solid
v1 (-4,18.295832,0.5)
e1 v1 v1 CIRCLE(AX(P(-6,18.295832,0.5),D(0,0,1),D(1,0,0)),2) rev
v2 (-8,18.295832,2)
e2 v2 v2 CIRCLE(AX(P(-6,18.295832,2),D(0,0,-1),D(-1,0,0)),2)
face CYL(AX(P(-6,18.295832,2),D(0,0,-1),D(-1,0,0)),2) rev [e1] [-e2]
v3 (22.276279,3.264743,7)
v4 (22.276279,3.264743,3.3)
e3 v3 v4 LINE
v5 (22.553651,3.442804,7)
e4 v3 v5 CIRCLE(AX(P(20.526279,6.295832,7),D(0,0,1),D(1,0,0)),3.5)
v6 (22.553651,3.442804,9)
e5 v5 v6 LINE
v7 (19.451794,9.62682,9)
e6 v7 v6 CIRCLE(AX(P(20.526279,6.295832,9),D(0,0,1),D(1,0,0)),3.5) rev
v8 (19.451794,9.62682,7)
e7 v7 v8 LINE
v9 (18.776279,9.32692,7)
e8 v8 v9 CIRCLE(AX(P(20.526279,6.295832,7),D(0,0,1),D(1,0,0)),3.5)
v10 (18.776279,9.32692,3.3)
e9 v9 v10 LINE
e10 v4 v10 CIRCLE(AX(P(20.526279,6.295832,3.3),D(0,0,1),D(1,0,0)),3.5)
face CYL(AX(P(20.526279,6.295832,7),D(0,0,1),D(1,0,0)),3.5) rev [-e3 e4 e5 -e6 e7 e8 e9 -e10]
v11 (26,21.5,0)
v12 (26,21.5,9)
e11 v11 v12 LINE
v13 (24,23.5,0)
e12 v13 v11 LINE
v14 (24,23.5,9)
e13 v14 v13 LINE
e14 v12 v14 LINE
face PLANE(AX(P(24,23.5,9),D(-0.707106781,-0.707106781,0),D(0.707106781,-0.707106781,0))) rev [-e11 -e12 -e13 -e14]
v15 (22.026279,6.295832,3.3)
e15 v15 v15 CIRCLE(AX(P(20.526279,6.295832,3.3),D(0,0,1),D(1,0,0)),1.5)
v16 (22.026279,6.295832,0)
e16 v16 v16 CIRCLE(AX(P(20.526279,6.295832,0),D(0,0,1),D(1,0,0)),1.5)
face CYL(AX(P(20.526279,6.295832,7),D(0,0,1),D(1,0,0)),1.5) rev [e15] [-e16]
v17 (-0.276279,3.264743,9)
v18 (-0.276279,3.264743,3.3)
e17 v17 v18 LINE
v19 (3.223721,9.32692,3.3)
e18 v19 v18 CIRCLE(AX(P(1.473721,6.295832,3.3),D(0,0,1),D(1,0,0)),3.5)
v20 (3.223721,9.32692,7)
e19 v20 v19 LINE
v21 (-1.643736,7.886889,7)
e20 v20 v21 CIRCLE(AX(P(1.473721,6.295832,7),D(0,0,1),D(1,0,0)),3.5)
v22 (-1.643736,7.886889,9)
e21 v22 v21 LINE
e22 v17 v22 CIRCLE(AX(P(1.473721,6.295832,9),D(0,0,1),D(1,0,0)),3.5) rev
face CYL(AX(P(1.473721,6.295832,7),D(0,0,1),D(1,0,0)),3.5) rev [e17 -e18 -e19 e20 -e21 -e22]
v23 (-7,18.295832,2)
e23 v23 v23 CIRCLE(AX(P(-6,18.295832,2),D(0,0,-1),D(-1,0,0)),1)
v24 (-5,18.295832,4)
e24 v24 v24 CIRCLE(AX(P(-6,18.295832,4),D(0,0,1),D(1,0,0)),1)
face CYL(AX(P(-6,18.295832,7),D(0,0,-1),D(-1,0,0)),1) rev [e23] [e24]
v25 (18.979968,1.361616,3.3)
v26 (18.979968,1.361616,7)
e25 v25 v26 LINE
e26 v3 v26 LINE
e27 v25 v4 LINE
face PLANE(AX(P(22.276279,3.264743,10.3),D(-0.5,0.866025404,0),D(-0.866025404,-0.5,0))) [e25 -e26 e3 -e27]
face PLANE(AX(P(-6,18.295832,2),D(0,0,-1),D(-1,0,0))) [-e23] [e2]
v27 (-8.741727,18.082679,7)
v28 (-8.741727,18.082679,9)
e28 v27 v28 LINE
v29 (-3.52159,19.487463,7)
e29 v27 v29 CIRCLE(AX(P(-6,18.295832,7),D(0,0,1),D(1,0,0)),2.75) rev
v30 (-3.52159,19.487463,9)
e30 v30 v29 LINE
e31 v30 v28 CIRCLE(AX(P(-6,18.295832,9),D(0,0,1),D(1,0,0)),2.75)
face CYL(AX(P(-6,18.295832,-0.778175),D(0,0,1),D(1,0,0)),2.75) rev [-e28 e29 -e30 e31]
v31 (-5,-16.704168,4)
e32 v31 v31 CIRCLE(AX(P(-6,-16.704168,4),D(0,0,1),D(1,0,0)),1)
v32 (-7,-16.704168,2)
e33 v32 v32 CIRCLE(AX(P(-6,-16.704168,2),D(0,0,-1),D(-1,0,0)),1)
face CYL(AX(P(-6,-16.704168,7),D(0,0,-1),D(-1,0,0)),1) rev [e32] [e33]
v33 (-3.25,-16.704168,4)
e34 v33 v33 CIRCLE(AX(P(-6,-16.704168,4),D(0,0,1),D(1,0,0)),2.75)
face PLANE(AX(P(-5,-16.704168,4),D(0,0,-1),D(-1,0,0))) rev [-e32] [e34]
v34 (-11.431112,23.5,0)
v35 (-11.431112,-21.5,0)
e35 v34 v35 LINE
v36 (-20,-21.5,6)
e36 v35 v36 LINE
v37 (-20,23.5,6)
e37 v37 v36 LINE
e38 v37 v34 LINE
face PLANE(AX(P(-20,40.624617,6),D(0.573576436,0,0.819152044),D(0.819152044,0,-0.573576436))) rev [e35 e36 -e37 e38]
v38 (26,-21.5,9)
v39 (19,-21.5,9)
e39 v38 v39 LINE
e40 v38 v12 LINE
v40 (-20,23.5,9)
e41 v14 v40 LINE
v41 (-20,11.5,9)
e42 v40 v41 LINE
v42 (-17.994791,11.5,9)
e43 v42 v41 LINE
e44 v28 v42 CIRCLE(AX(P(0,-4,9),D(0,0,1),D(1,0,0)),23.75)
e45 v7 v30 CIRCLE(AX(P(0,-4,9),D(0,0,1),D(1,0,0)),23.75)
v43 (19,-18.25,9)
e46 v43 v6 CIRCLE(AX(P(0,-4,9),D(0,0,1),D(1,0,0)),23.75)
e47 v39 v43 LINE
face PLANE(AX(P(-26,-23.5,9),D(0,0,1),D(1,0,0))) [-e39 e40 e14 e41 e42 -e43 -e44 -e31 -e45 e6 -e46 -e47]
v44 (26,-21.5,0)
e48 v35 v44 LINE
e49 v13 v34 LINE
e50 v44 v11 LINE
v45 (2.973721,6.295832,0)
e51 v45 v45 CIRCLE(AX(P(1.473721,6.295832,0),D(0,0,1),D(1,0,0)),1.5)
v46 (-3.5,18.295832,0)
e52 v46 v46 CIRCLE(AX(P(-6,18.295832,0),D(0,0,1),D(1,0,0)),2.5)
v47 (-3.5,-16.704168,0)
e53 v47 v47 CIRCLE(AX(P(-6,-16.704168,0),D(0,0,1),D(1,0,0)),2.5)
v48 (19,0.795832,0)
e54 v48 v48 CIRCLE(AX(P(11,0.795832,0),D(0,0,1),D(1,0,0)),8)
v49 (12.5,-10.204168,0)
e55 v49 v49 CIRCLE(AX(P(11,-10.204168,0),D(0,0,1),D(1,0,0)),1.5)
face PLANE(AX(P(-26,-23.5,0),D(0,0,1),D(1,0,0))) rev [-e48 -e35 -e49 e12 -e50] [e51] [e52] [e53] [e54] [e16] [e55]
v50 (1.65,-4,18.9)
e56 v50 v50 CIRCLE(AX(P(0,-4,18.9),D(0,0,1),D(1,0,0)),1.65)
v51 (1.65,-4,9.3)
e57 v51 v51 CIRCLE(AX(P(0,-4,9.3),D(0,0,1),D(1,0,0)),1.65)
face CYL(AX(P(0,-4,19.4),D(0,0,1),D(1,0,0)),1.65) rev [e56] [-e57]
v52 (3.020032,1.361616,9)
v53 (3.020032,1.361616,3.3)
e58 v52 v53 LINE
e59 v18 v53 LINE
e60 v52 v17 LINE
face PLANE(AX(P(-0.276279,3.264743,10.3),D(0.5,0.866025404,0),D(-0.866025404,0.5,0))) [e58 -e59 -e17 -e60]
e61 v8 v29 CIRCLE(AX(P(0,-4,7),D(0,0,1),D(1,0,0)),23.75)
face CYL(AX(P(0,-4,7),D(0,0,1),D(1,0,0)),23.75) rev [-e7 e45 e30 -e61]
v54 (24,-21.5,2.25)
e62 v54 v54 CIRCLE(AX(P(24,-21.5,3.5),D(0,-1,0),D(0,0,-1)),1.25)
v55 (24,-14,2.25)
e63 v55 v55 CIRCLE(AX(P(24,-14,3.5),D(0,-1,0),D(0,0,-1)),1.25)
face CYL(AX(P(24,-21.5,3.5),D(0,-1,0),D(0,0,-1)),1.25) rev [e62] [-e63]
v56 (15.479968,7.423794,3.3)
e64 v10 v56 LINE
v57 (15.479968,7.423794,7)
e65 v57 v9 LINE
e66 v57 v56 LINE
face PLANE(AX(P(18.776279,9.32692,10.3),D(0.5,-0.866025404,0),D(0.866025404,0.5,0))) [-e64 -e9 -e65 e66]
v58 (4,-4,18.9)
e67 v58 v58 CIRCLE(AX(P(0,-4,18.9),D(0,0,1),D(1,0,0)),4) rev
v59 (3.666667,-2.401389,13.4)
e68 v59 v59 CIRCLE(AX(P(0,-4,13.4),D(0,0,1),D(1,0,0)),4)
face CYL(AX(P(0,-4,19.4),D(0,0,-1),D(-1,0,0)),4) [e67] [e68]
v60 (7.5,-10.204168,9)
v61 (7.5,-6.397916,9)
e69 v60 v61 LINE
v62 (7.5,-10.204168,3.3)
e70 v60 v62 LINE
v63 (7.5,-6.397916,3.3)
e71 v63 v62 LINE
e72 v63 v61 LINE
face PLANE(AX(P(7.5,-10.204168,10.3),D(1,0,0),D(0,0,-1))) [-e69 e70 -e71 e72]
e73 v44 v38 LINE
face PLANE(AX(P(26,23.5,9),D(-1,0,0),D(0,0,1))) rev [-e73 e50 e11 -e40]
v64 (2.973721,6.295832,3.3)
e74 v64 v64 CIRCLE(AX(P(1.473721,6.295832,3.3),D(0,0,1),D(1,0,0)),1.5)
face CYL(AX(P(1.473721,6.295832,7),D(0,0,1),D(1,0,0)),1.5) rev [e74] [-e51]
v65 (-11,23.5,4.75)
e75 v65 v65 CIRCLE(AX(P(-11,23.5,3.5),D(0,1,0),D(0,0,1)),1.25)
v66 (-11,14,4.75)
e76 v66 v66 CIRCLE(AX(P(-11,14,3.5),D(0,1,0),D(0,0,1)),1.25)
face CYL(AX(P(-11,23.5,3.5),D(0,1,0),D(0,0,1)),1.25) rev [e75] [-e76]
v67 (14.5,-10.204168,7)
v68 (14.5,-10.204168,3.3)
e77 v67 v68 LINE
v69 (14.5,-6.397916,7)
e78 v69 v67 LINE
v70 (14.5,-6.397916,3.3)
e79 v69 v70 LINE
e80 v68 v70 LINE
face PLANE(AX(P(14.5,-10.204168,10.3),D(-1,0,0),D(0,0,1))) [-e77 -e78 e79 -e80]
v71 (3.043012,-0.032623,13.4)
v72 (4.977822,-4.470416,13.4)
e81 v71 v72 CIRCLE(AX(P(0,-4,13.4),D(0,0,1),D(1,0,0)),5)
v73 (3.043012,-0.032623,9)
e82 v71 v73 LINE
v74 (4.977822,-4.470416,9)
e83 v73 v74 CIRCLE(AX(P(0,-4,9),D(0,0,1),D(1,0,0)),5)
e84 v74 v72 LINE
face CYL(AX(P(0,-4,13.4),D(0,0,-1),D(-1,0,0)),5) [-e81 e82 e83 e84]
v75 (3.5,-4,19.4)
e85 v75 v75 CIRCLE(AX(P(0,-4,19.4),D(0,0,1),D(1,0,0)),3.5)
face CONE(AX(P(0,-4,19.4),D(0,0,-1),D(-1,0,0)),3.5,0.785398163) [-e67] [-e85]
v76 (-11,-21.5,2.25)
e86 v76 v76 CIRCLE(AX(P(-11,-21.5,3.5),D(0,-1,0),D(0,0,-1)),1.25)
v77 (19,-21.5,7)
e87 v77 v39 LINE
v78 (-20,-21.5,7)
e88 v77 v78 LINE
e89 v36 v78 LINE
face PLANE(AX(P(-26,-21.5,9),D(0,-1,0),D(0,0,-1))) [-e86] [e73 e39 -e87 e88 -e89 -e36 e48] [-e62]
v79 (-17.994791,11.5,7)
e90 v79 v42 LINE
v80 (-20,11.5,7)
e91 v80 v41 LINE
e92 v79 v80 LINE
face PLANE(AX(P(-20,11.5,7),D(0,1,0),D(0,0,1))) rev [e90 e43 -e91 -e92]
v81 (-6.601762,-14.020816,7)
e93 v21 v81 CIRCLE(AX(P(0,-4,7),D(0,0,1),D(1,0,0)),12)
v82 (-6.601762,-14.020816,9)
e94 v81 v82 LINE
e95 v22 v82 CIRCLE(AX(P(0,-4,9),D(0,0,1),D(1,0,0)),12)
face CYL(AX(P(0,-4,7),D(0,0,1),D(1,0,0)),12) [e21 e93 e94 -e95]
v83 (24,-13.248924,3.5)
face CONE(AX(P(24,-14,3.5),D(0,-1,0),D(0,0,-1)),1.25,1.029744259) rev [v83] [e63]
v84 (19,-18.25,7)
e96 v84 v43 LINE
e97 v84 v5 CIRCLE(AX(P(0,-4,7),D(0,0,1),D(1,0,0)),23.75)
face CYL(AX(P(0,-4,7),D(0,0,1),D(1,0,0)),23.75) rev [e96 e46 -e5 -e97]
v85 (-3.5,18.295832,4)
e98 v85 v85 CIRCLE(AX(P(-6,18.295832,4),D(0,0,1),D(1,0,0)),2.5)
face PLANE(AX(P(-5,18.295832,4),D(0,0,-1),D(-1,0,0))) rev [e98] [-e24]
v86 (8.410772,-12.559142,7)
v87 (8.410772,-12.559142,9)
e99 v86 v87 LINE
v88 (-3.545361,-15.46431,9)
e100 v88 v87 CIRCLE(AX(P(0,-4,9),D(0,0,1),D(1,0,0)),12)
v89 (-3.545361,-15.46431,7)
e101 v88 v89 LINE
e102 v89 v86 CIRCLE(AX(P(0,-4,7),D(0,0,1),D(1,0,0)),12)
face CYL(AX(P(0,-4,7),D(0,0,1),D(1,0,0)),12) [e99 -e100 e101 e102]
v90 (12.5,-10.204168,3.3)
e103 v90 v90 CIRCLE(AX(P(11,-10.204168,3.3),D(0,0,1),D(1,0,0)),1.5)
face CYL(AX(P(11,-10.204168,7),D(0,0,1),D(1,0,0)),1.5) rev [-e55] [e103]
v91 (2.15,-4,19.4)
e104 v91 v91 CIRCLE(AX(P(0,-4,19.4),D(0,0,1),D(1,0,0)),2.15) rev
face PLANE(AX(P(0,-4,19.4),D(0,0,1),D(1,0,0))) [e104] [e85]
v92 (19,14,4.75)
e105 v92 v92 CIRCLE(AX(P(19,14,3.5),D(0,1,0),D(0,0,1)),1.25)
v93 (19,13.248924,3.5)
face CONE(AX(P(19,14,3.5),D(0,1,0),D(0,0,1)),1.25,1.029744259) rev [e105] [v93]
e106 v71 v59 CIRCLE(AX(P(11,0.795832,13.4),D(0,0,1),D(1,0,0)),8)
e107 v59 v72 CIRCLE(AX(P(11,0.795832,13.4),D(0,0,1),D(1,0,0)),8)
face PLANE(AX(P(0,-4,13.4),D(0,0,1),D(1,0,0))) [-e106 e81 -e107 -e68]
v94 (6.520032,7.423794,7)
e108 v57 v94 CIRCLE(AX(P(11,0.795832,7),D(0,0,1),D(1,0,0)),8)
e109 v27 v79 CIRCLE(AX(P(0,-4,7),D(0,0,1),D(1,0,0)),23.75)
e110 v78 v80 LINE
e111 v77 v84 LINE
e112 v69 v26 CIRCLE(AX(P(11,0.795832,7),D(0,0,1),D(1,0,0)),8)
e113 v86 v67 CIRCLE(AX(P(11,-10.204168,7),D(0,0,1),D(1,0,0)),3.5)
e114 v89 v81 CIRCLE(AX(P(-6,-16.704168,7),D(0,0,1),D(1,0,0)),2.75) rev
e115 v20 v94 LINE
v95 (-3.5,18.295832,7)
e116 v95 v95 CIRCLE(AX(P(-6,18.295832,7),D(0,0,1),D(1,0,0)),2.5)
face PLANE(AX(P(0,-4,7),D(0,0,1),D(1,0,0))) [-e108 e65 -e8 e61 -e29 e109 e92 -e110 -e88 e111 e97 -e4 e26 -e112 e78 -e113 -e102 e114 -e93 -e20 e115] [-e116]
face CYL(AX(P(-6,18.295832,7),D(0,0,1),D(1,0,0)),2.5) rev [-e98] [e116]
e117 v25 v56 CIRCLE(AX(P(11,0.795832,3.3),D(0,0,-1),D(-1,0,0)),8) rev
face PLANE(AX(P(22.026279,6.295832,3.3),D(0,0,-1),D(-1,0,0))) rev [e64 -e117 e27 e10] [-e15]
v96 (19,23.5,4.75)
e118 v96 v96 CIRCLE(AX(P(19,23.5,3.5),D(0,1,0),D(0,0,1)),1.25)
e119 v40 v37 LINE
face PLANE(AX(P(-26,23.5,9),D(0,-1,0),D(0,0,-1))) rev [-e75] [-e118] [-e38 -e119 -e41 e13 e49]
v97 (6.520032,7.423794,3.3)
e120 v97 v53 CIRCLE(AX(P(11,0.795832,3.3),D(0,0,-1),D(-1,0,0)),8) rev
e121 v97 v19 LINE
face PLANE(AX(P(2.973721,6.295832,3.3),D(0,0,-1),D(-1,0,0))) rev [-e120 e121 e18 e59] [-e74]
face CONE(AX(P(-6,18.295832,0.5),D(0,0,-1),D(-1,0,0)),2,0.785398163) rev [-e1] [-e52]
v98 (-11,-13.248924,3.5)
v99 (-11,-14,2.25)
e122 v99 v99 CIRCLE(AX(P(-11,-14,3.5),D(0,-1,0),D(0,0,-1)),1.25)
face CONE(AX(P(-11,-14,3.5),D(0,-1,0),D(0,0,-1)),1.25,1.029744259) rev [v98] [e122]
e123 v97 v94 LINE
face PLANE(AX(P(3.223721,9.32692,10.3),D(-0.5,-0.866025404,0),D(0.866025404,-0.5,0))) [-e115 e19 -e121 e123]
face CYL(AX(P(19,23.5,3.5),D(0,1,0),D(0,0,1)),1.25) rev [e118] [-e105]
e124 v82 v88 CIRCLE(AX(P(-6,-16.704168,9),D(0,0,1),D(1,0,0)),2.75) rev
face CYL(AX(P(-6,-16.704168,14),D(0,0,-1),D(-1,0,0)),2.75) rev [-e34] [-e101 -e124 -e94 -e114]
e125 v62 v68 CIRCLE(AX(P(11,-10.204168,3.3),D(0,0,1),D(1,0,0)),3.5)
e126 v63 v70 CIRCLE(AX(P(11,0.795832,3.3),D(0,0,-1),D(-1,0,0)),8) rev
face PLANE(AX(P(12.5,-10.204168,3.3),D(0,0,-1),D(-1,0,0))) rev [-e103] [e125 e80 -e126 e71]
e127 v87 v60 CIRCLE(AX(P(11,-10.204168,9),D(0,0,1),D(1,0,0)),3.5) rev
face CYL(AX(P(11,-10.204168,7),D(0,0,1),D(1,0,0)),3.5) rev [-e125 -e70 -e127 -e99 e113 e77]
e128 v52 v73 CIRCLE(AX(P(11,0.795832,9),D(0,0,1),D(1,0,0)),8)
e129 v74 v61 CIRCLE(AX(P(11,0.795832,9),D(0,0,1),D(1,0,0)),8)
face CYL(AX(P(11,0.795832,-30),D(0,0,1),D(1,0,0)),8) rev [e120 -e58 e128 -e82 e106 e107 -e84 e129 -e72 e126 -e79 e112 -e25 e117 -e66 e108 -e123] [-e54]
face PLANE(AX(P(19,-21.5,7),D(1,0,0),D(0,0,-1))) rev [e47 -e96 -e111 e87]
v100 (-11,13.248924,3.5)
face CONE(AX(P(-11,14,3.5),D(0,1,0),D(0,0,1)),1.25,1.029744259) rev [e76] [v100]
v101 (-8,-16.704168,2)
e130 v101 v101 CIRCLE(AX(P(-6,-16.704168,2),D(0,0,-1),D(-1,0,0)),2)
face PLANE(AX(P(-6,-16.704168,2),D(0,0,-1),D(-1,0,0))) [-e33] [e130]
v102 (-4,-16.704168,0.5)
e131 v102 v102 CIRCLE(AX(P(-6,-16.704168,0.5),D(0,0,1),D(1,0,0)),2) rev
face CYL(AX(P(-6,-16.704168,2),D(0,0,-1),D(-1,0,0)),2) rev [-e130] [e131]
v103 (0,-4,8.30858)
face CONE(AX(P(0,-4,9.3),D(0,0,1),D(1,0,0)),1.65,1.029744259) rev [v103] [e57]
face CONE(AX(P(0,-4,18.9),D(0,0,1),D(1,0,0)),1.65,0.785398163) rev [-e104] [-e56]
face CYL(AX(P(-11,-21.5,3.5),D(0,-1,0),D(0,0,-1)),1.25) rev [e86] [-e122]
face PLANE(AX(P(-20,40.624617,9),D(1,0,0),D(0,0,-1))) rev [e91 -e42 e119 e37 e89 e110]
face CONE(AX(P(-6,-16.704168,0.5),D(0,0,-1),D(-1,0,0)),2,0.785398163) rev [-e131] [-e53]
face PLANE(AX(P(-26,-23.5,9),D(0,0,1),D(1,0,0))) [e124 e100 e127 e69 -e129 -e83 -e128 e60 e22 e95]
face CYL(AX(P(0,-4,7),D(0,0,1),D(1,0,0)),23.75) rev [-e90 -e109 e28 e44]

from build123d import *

# Parameters (mm, degrees)
SKETCH_1_W                 = 52
SKETCH_1_H                 = 47
EXTRUDE_1_DEPTH            = 9
SKETCH_19_R                = 23.75
SKETCH_19_R_2              = 12
CUT_EXTRUDE_2_DEPTH        = 2
SKETCH_20_R                = 5
EXTRUDE_3_DEPTH            = 4.4
SKETCH_21_R                = 4
EXTRUDE_4_DEPTH            = 6
SKETCH_22_R                = 8
CUT_EXTRUDE_5_DEPTH        = 39
CUT_EXTRUDE_6_DEPTH        = 47
HOLE_WIZARD_M3_1_D         = 2.5
HOLE_WIZARD_M3_1_DEPTH     = 9.5
HOLE_WIZARD_M3_1_TIP       = 0.751075774
HOLE_WIZARD_M4_2_D         = 3.3
HOLE_WIZARD_M4_2_DEPTH     = 10.1
HOLE_WIZARD_M4_2_TIP       = 0.991420021
CHAMFER_3_SIZE             = 0.5
CHAMFER_6_SIZE             = 2
EXTRUDE3_DEPTH             = 2
EXTRUDE4_REACH             = 57.474
SKETCH_35_R                = 3.25
CUT_EXTRUDE_1_DEPTH        = 2
PATTERN_CIRCULAR_1_COUNT   = 3
HOLE_WIZARD_2_AT_2_COUNT   = 2
HOLE_WIZARD_2_AT_2_PITCH   = 19.052558883
HOLE_WIZARD_2_AT_3_COUNT   = 2
HOLE_WIZARD_2_AT_3_PITCH   = 19.052558883
HOLE_WIZARD_M3_2_D         = 2.5
HOLE_WIZARD_M3_2_DEPTH     = 7.5
HOLE_WIZARD_M3_2_TIP       = 0.751075774
CUT_EXTRUDE_START          = 10
CUT_EXTRUDE_3_DEPTH        = 10
SKETCH_42_R                = 2
CUT_EXTRUDE_4_DEPTH        = 2
CHAMFER_7_SIZE             = 0.5
SKETCH_43_R                = 1
CUT_EXTRUDE_5_2_DEPTH      = 5
SKETCH_44_R                = 2.75
CUT_EXTRUDE_7_DEPTH        = 2
HOLE_WIZARD_2_2_AT_2_COUNT = 2
HOLE_WIZARD_2_2_AT_2_PITCH = 35
SKETCH_46_R                = 2.25
CUT_EXTRUDE_8_DEPTH        = 3
SKETCH_48_W                = 2.005209087
SKETCH_48_H                = 2.691311543
SKETCH_48_W_2              = 2.943459277
SKETCH_48_H_2              = 3.25
CUT_EXTRUDE_9_DEPTH        = 2
CUT_EXTRUDE_START_2        = 7
CUT_EXTRUDE_12_DEPTH       = 7
CUT_EXTRUDE_13_OUTLINE_R   = 2.75
CUT_EXTRUDE_13_DEPTH       = 5
CUT_EXTRUDE_START_3        = -0.7
CUT_EXTRUDE_13_2_DEPTH     = 0.7


# Read off the part's stored shape, not the designer's step: 切除-拉伸13
with BuildPart() as part:
    # 草图1 → 拉伸1 (new body)
    with BuildSketch(Plane.XY):
        Rectangle(SKETCH_1_W, SKETCH_1_H)
    extrude(amount=EXTRUDE_1_DEPTH)

    # 草图19 → Cut-Extrude 2 (cut)
    with BuildSketch(Plane.XY.offset(9)):
        with Locations((0, -4)):
            Circle(SKETCH_19_R)
        with Locations((0, -4)):
            Circle(SKETCH_19_R_2, mode=Mode.SUBTRACT)
    extrude(amount=-CUT_EXTRUDE_2_DEPTH, mode=Mode.SUBTRACT)

    # 草图20 → 拉伸3 (add)
    with BuildSketch(Plane.XY.offset(9)):
        with Locations((0, -4)):
            Circle(SKETCH_20_R)
    extrude(amount=EXTRUDE_3_DEPTH)

    # 草图21 → 拉伸4 (add)
    with BuildSketch(Plane.XY.offset(13.4)):
        with Locations((0, -4)):
            Circle(SKETCH_21_R)
    extrude(amount=EXTRUDE_4_DEPTH)

    # 草图22 → Cut-Extrude 5 (cut, symmetric)
    with BuildSketch(Plane.XY.offset(9)):
        with Locations((11, 0.795831523)):
            Circle(SKETCH_22_R)
    extrude(amount=CUT_EXTRUDE_5_DEPTH, both=True, mode=Mode.SUBTRACT)

    # 草图25 → 拉伸6 (cut)
    with BuildSketch(Plane.XZ.offset(23.5)):
        Polygon((-26, 8), (-14.574815946, 0), (-26, 0), align=None)
    extrude(amount=-CUT_EXTRUDE_6_DEPTH, mode=Mode.SUBTRACT)

    # M3 螺纹孔1
    with Locations(Plane(origin=(-11, 23.5, 3.5), x_dir=(0, 0, 1), z_dir=(0, 1, 0))):
        with Locations((0, 0), (0, 30)):
            Hole(HOLE_WIZARD_M3_1_D / 2, depth=HOLE_WIZARD_M3_1_DEPTH)
            with Locations((0, 0, -(HOLE_WIZARD_M3_1_DEPTH + HOLE_WIZARD_M3_1_TIP / 2))):  # 118° drill point
                Cone(0, HOLE_WIZARD_M3_1_D / 2, HOLE_WIZARD_M3_1_TIP, mode=Mode.SUBTRACT)

    # M4 螺纹孔2
    with Locations(Plane(origin=(0, -4, 19.4), x_dir=(1, 0, 0), z_dir=(0, 0, 1))):
        with Locations((0, 0)):
            Hole(HOLE_WIZARD_M4_2_D / 2, depth=HOLE_WIZARD_M4_2_DEPTH)
            with Locations((0, 0, -(HOLE_WIZARD_M4_2_DEPTH + HOLE_WIZARD_M4_2_TIP / 2))):  # 118° drill point
                Cone(0, HOLE_WIZARD_M4_2_D / 2, HOLE_WIZARD_M4_2_TIP, mode=Mode.SUBTRACT)

    # 倒角3
    chamfer_3_edges = [part.edges().sort_by_distance(p)[0] for p in [
        (-4, -4, 19.4),
        (1.65, -4, 19.4),
    ]]
    chamfer(chamfer_3_edges, length=CHAMFER_3_SIZE)

    # 倒角6
    chamfer_6_edges = [part.edges().sort_by_distance(p)[0] for p in [
        (26, 23.5, 4.5),
    ]]
    chamfer(chamfer_6_edges, length=CHAMFER_6_SIZE)

    # Sketch6 → Extrude3 (cut)
    with BuildSketch(Plane.XZ.offset(23.5)):
        Polygon((-26, 9), (-26, 8), (-14.574815946, 0), (26, 0), (26, 9), (13.557746863, 9), (13.557746863, 7), (-13.557746863, 7), (-13.557746863, 9), align=None)
    extrude(amount=-EXTRUDE3_DEPTH, mode=Mode.SUBTRACT)

    # Extrude4: up to this face of the body (flat: up to its plane)
    extrude4_end = Plane(part.part.faces().sort_by_distance((1.330613504, 23.5, 4.737278788))[0])
    # Sketch7 → Extrude4 (cut, up to the picked face)
    with BuildSketch(Plane.XZ.offset(21.5), mode=Mode.PRIVATE) as extrude4_sk1:
        Polygon((-20, 9), (-20, 6), (-11.43111196, 0), (-14.574815946, 0), (-26, 8), (-26, 9), align=None)
    extrude4_tool1 = split(extrude(extrude4_sk1.sketch, amount=-EXTRUDE4_REACH, mode=Mode.PRIVATE), bisect_by=extrude4_end, keep=Keep.BOTH, mode=Mode.PRIVATE)
    add(extrude4_tool1.solids().sort_by(Axis((-19.659359, -21.5, 5.073959), (0, 1, 0)))[0], mode=Mode.SUBTRACT)

    # 草图35 → 切除-拉伸1 (cut)
    with BuildSketch(Plane.XY.offset(9)):
        with Locations((1.473720558, 6.295831523)):
            Circle(SKETCH_35_R)
    cut_extrude_1 = extrude(amount=-CUT_EXTRUDE_1_DEPTH, mode=Mode.SUBTRACT)

    # 阵列(圆周)1: 切除-拉伸1 ×3 about axis
    pattern_circular_1_axis = Axis((11, 0.795831523, 0), (0, 0, 1))
    for i in range(1, PATTERN_CIRCULAR_1_COUNT):
        add(cut_extrude_1.rotate(pattern_circular_1_axis, i * 360 / PATTERN_CIRCULAR_1_COUNT), mode=Mode.SUBTRACT)

    # 草图36 → Hole Wizard 2 (revolve, cut)
    with BuildSketch(Plane(origin=(1.473720558, 6.295831523, 7), x_dir=(0, -1, 0), z_dir=(1, 0, 0))):
        Polygon((0, 0), (0, 7), (1.5, 7), (1.5, 3.7), (3.5, 3.7), (3.5, 0), align=None)
    hole_wizard_2 = revolve(axis=Axis((1.473720558, 6.295831523, 13.35), (0, 0, -1)), mode=Mode.SUBTRACT)

    # Hole Wizard 2 at 2: Hole Wizard 2 ×2
    with Locations(*[(i * HOLE_WIZARD_2_AT_2_PITCH, 0, 0) for i in range(1, HOLE_WIZARD_2_AT_2_COUNT)]):
        add(hole_wizard_2, mode=Mode.SUBTRACT)

    # Hole Wizard 2 at 3: Hole Wizard 2 ×2
    with Locations(*[Vector(0.49999999999999806, -0.8660254037844398, 0) * (i * HOLE_WIZARD_2_AT_3_PITCH) for i in range(1, HOLE_WIZARD_2_AT_3_COUNT)]):
        add(hole_wizard_2, mode=Mode.SUBTRACT)

    # M3 螺纹孔2
    with Locations(Plane(origin=(-11, -21.5, 3.5), x_dir=(0, 0, -1), z_dir=(0, -1, 0))):
        with Locations((0, 0), (0, 35)):
            Hole(HOLE_WIZARD_M3_2_D / 2, depth=HOLE_WIZARD_M3_2_DEPTH)
            with Locations((0, 0, -(HOLE_WIZARD_M3_2_DEPTH + HOLE_WIZARD_M3_2_TIP / 2))):  # 118° drill point
                Cone(0, HOLE_WIZARD_M3_2_D / 2, HOLE_WIZARD_M3_2_TIP, mode=Mode.SUBTRACT)

    # 草图41 → 切除-拉伸3 (cut)
    with BuildSketch(Plane.XY.offset(7).offset(CUT_EXTRUDE_START)):
        with BuildLine():
            Line((1.473720558, 9.795831523), (7.585559388, 9.795831523))
            ThreePointArc((7.585559388, 9.795831523), (11.085559388, 6.295831523), (7.585559388, 2.795831523))
            Line((7.585559388, 2.795831523), (1.473720558, 2.795831523))
            ThreePointArc((1.473720558, 2.795831523), (-2.026279442, 6.295831523), (1.473720558, 9.795831523))
        make_face()
    extrude(amount=-CUT_EXTRUDE_3_DEPTH, mode=Mode.SUBTRACT)

    # 草图42 → 切除-拉伸4 (cut)
    with BuildSketch(Plane(origin=(0, 0, 0), x_dir=(-1, 0, 0), z_dir=(0, 0, -1))):
        with Locations((6, 18.295831523)):
            Circle(SKETCH_42_R)
        with Locations((6, -16.704168477)):
            Circle(SKETCH_42_R)
    extrude(amount=-CUT_EXTRUDE_4_DEPTH, mode=Mode.SUBTRACT)

    # 倒角7
    chamfer_7_edges = [part.edges().sort_by_distance(p)[0] for p in [
        (-4, 18.295831523, 0),
        (-4, -16.704168477, 0),
    ]]
    chamfer(chamfer_7_edges, length=CHAMFER_7_SIZE)

    # 草图43 → Cut-Extrude 5 2 (cut)
    with BuildSketch(Plane(origin=(0, 0, 2), x_dir=(-1, 0, 0), z_dir=(0, 0, -1))):
        with Locations((6, 18.295831523)):
            Circle(SKETCH_43_R)
        with Locations((6, -16.704168477)):
            Circle(SKETCH_43_R)
    extrude(amount=-CUT_EXTRUDE_5_2_DEPTH, mode=Mode.SUBTRACT)

    # 草图44 → 切除-拉伸7 (cut)
    with BuildSketch(Plane.XY.offset(9)):
        with Locations((-6, 18.295831523)):
            Circle(SKETCH_44_R)
    extrude(amount=-CUT_EXTRUDE_7_DEPTH, mode=Mode.SUBTRACT)

    # 草图45 → Hole Wizard 2 2 (revolve, cut)
    with BuildSketch(Plane(origin=(-6, 18.295831523, 7), x_dir=(0, -1, 0), z_dir=(1, 0, 0))):
        Polygon((0, 0), (0, 7), (1, 7), (1, 3), (2.5, 3), (2.5, 0), align=None)
    hole_wizard_2_2 = revolve(axis=Axis((-6, 18.295831523, 13.35), (0, 0, -1)), mode=Mode.SUBTRACT)

    # Hole Wizard 2 2 at 2: Hole Wizard 2 2 ×2
    with Locations(*[(0, -i * HOLE_WIZARD_2_2_AT_2_PITCH, 0) for i in range(1, HOLE_WIZARD_2_2_AT_2_COUNT)]):
        add(hole_wizard_2_2, mode=Mode.SUBTRACT)

    # 草图46 → 切除-拉伸8 (cut)
    with BuildSketch(Plane.XY.offset(7)):
        with Locations((-6, -16.704168477)):
            Circle(SKETCH_46_R)
    extrude(amount=CUT_EXTRUDE_8_DEPTH, mode=Mode.SUBTRACT)

    # 草图48 → 切除-拉伸9 (cut)
    with BuildSketch(Plane.XY.offset(9)):
        Polygon((-20, -21.5), (-16.056540723, -21.5), (-20, -16.808688457), align=None)
        with Locations((-18.997395457, 10.154344229)):
            Rectangle(SKETCH_48_W, SKETCH_48_H)
        with Locations((17.528270361, -19.875)):
            Rectangle(SKETCH_48_W_2, SKETCH_48_H_2)
    extrude(amount=-CUT_EXTRUDE_9_DEPTH, mode=Mode.SUBTRACT)

    # 草图52 → 切除-拉伸12 (cut)
    with BuildSketch(Plane.XY.offset(3.3).offset(CUT_EXTRUDE_START_2)):
        with BuildLine():
            Line((7.5, -10.204168477), (7.5, 0.795831523))
            ThreePointArc((7.5, 0.795831523), (11, 4.295831523), (14.5, 0.795831523))
            Line((14.5, 0.795831523), (14.5, -10.204168477))
            ThreePointArc((14.5, -10.204168477), (11, -13.704168477), (7.5, -10.204168477))
        make_face()
    extrude(amount=-CUT_EXTRUDE_12_DEPTH, mode=Mode.SUBTRACT)

    # 切除-拉伸13 outline → 切除-拉伸13 (cut)
    with BuildSketch(Plane.XY.offset(4)):
        with BuildLine():
            Line((18.979967897, 1.361616253), (22.276279442, 3.26474261))
            ThreePointArc((22.276279442, 3.26474261), (23.557368355, 8.045831523), (18.776279442, 9.326920437))
            Line((18.776279442, 9.326920437), (15.479967897, 7.423794079))
            ThreePointArc((15.479967897, 7.423794079), (17.92820323, 4.795831523), (18.979967897, 1.361616253))
        make_face()
        with BuildLine():
            ThreePointArc((4.964881512, 6.047245127), (5.697596566, 6.786200278), (6.520032103, 7.423794079))
            Line((6.520032103, 7.423794079), (3.223720558, 9.326920437))
            ThreePointArc((3.223720558, 9.326920437), (4.56508103, 7.937017202), (4.964881512, 6.047245127))
        make_face()
        with BuildLine():
            Line((-0.276279442, 3.26474261), (3.020032103, 1.361616253))
            ThreePointArc((3.020032103, 1.361616253), (3.160986763, 2.392663221), (3.43458317, 3.396690647))
            ThreePointArc((3.43458317, 3.396690647), (1.598092305, 2.798041983), (-0.276279442, 3.26474261))
        make_face()
        with Locations((-6, -16.704168477)):
            Circle(CUT_EXTRUDE_13_OUTLINE_R)
    extrude(amount=CUT_EXTRUDE_13_DEPTH, mode=Mode.SUBTRACT)

    # Cut-Extrude 13 2 outline → Cut-Extrude 13 2 (cut)
    with BuildSketch(Plane.XY.offset(4).offset(CUT_EXTRUDE_START_3)):
        with BuildLine():
            Line((18.979967897, 1.361616253), (22.276279442, 3.26474261))
            ThreePointArc((22.276279442, 3.26474261), (20.401907695, 2.798041983), (18.56541683, 3.396690647))
            ThreePointArc((18.56541683, 3.396690647), (18.839013237, 2.392663221), (18.979967897, 1.361616253))
        make_face()
        with BuildLine():
            ThreePointArc((17.035118488, 6.047245127), (17.43491897, 7.937017202), (18.776279442, 9.326920437))
            Line((18.776279442, 9.326920437), (15.479967897, 7.423794079))
            ThreePointArc((15.479967897, 7.423794079), (16.302403434, 6.786200278), (17.035118488, 6.047245127))
        make_face()
        with BuildLine():
            ThreePointArc((4.964881512, 6.047245127), (5.697596566, 6.786200278), (6.520032103, 7.423794079))
            Line((6.520032103, 7.423794079), (3.223720558, 9.326920437))
            ThreePointArc((3.223720558, 9.326920437), (4.56508103, 7.937017202), (4.964881512, 6.047245127))
        make_face()
        with BuildLine():
            Line((-0.276279442, 3.26474261), (3.020032103, 1.361616253))
            ThreePointArc((3.020032103, 1.361616253), (3.160986763, 2.392663221), (3.43458317, 3.396690647))
            ThreePointArc((3.43458317, 3.396690647), (1.598092305, 2.798041983), (-0.276279442, 3.26474261))
        make_face()
    extrude(amount=CUT_EXTRUDE_13_2_DEPTH, mode=Mode.SUBTRACT)


solid = part.part
